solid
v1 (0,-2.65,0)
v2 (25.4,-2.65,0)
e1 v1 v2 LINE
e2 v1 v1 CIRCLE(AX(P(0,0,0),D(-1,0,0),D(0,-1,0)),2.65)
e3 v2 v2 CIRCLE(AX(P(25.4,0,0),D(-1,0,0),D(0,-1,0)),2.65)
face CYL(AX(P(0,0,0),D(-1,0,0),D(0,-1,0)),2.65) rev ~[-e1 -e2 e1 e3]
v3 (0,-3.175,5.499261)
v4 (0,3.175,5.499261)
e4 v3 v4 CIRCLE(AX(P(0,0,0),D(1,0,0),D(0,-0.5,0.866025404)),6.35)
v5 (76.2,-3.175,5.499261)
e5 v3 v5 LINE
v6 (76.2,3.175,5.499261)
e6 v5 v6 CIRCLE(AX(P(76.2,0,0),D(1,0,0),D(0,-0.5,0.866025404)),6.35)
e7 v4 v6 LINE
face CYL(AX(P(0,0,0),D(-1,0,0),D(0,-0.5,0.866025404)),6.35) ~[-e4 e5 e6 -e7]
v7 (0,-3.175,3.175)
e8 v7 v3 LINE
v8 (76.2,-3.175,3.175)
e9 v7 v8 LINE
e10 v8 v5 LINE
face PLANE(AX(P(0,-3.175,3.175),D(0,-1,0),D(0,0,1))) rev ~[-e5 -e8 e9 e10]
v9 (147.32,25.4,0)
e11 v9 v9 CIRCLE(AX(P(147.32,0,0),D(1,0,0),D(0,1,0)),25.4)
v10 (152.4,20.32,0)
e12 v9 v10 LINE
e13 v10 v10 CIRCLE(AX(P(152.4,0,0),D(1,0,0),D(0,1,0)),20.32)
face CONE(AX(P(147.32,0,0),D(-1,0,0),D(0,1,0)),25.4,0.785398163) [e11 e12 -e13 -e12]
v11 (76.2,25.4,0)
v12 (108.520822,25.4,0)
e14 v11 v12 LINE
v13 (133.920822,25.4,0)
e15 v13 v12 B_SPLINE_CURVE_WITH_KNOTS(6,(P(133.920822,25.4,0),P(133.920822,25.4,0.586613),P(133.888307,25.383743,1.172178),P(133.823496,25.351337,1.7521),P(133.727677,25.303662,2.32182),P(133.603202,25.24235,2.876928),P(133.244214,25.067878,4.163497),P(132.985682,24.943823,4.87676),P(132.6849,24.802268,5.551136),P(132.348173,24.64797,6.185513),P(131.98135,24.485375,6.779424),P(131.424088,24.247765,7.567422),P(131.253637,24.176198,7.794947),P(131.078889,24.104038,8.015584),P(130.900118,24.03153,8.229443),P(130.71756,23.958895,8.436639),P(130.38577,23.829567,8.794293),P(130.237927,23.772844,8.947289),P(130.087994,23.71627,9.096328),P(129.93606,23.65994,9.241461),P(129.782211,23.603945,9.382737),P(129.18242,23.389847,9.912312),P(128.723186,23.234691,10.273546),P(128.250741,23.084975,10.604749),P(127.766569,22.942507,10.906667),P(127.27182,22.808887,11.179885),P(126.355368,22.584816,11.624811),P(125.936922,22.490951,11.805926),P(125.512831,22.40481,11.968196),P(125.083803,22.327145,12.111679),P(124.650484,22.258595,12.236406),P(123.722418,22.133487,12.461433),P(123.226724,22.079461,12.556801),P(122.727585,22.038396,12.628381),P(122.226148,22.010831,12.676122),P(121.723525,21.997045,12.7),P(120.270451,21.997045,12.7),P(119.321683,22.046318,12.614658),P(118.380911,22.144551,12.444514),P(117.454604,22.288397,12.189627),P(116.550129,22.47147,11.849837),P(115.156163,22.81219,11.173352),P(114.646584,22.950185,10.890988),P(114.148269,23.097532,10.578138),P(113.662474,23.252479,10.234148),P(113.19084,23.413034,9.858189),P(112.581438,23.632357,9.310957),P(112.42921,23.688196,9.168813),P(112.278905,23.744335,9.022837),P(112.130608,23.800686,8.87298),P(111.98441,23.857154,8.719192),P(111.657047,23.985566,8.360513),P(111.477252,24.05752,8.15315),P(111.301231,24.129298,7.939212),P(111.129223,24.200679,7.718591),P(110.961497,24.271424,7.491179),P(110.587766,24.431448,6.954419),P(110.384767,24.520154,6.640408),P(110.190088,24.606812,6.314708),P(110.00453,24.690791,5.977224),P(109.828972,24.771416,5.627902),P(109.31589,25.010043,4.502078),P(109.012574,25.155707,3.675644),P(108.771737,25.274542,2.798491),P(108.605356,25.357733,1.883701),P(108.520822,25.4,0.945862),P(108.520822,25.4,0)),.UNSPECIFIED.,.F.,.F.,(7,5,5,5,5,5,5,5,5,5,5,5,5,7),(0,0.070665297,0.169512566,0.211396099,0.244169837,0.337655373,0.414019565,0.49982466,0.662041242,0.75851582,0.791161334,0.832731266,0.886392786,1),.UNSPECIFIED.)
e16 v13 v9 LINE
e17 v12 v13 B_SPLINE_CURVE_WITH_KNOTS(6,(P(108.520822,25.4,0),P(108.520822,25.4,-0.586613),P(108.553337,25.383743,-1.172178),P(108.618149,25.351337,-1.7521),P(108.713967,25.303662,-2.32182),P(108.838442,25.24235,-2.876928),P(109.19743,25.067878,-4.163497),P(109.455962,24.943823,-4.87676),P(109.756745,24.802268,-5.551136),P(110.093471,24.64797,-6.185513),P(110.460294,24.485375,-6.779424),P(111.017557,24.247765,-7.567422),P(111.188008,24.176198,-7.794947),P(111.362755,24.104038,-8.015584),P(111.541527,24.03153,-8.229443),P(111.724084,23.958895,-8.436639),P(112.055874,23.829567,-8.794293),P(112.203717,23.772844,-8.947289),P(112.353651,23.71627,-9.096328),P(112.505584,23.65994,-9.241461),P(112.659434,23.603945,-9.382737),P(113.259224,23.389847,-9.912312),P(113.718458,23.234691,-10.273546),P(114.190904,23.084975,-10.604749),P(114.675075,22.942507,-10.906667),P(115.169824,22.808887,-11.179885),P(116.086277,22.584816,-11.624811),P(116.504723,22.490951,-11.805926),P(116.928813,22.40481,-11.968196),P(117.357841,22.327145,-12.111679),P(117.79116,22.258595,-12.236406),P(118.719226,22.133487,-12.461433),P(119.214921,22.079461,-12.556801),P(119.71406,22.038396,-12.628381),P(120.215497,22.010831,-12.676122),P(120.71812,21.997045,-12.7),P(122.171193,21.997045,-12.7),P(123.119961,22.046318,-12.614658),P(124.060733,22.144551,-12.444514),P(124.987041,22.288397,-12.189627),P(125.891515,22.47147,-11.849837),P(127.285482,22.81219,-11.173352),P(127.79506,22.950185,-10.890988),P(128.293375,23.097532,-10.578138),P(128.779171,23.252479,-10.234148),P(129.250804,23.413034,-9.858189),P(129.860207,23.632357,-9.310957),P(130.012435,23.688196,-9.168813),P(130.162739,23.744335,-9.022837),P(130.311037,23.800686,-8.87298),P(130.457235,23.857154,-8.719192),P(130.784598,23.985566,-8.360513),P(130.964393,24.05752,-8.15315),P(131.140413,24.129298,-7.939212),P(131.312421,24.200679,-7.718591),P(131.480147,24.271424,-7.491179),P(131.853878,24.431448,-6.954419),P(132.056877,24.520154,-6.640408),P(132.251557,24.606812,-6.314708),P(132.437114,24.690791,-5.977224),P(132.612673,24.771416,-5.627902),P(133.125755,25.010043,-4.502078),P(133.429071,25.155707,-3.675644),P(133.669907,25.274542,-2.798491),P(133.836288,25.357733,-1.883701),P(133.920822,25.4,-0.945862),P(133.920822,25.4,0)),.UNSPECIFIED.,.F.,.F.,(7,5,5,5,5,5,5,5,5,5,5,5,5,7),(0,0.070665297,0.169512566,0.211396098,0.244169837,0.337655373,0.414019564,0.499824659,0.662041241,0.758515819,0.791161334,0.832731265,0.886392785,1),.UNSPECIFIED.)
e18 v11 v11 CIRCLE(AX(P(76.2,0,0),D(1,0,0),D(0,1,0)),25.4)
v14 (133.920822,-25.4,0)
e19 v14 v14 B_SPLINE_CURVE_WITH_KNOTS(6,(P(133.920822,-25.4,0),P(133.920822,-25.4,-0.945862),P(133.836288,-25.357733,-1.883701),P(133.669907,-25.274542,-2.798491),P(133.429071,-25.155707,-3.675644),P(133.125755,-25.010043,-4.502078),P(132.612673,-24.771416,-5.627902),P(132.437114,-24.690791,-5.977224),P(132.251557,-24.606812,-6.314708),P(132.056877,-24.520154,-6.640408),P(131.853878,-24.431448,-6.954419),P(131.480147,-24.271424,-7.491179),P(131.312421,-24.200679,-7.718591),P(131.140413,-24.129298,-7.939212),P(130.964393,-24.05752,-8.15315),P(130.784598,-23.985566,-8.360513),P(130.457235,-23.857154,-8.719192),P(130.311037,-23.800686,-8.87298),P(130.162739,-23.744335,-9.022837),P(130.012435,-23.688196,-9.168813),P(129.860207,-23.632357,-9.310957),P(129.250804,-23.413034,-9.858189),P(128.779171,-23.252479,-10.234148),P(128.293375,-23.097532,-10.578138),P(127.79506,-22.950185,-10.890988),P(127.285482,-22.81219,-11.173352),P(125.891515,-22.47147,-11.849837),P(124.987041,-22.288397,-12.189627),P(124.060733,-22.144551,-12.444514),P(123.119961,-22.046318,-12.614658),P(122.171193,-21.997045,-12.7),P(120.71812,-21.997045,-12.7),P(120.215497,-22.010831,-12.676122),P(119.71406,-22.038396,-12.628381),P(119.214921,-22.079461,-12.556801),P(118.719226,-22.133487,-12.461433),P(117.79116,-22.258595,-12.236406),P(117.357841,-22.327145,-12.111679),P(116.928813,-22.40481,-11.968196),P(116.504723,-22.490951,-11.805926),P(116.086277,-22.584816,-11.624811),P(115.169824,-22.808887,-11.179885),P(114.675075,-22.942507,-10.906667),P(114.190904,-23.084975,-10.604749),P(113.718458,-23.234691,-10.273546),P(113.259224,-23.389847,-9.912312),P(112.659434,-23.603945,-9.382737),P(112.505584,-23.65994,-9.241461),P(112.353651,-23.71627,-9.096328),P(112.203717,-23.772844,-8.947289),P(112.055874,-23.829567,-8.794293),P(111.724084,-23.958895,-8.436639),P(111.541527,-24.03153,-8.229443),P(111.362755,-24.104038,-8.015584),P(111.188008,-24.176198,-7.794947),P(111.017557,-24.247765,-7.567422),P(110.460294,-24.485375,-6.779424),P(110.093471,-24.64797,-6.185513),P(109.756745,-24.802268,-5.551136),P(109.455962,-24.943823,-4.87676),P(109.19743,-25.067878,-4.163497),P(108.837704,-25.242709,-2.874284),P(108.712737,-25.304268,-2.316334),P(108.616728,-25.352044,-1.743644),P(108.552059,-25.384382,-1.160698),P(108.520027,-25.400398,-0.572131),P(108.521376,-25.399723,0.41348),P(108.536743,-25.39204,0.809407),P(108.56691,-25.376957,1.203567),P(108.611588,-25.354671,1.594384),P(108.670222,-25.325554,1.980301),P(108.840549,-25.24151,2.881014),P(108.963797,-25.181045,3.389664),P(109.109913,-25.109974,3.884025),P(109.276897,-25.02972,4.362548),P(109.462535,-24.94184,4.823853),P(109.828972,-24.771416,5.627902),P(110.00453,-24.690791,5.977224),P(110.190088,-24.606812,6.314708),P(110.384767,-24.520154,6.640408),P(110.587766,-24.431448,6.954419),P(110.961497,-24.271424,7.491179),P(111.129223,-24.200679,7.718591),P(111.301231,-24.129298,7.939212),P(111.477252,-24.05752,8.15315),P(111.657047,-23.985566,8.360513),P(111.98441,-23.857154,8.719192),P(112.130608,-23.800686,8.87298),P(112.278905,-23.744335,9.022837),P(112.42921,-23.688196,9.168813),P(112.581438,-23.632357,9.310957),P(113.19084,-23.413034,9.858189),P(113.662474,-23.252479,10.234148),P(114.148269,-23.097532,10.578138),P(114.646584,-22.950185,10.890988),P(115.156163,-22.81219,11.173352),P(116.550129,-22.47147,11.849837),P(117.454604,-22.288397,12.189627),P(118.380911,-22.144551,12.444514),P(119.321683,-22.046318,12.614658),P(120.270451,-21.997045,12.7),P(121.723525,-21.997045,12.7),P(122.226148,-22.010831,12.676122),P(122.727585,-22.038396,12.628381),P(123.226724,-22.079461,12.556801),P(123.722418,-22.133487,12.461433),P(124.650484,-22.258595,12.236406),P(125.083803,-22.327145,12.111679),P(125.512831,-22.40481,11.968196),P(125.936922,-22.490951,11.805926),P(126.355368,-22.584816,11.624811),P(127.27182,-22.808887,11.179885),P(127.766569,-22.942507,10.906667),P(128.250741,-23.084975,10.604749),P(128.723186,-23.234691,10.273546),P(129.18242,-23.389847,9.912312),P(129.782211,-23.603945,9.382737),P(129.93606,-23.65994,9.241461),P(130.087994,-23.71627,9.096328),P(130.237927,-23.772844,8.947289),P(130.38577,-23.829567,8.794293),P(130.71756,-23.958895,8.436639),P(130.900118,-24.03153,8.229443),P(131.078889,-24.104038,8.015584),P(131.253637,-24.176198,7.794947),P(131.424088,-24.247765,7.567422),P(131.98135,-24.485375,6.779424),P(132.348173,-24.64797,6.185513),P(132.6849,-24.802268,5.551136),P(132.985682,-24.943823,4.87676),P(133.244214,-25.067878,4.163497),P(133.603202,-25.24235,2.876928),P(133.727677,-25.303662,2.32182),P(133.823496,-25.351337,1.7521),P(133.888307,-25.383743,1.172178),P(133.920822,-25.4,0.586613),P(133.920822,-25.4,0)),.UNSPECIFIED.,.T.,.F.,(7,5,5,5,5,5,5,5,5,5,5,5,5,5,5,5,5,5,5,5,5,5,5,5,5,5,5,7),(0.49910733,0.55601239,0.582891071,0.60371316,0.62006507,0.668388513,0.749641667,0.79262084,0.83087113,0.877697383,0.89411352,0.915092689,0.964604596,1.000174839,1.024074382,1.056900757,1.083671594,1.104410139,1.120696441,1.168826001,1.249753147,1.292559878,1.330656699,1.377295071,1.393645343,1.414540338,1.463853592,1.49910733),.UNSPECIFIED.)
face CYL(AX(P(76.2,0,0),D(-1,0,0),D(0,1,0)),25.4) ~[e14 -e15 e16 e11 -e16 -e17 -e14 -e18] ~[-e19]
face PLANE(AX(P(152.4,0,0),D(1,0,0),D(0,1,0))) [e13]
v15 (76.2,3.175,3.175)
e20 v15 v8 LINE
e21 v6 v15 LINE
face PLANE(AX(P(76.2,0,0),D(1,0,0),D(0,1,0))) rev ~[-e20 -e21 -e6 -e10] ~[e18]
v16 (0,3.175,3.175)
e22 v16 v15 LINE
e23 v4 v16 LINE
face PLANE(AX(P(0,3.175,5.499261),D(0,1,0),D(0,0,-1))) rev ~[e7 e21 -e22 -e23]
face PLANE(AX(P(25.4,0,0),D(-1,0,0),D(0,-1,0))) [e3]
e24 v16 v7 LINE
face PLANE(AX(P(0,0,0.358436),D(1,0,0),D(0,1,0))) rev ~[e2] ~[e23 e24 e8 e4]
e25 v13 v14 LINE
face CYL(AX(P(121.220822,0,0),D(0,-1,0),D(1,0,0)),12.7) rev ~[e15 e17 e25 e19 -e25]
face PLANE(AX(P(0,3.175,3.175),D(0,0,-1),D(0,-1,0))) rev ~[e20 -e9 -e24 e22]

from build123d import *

# Parameters (mm, degrees)
F1_DEPTH = 76.2
F2_R     = 25.4
F3_DEPTH = 76.2
F4_R     = 2.65
F5_DEPTH = 25.4
F6_R     = 12.7
F7_DEPTH = 25.4
F8_SIZE  = 5.08


with BuildPart() as f1:
    # F0 (on Right) → F1 (new body)
    with BuildSketch(Plane.YZ):
        with BuildLine():
            Line((-3.175, 3.175), (-3.175, 5.499261314))
            ThreePointArc((-3.175, 5.499261314), (0, -6.35), (3.175, 5.499261314))
            Line((3.175, 5.499261314), (3.175, 3.175))
            Line((3.175, 3.175), (-3.175, 3.175))
        make_face()
    extrude(amount=F1_DEPTH)

    # F2 (on face) → F3 (join)
    with BuildSketch(Plane.YZ.offset(76.2)):
        Circle(F2_R)
    extrude(amount=F3_DEPTH)

    # F4 (on face) → F5 (cut)
    with BuildSketch(Plane(origin=(0, 0, 0), x_dir=(0, -1, 0), z_dir=(-1, 0, 0))):
        Circle(F4_R)
    extrude(amount=-F5_DEPTH, mode=Mode.SUBTRACT)

    # F6 (on Front) → F7 (cut, symmetric)
    with BuildSketch(Plane.XZ):
        with Locations((121.220822216, 0)):
            Circle(F6_R)
    extrude(amount=F7_DEPTH, both=True, mode=Mode.SUBTRACT)

    # F8
    f8_edges = [f1.edges().sort_by_distance(p)[0] for p in [
        (152.4, -25.4, 0),
    ]]
    chamfer(f8_edges, length=F8_SIZE)


solid = f1.part
